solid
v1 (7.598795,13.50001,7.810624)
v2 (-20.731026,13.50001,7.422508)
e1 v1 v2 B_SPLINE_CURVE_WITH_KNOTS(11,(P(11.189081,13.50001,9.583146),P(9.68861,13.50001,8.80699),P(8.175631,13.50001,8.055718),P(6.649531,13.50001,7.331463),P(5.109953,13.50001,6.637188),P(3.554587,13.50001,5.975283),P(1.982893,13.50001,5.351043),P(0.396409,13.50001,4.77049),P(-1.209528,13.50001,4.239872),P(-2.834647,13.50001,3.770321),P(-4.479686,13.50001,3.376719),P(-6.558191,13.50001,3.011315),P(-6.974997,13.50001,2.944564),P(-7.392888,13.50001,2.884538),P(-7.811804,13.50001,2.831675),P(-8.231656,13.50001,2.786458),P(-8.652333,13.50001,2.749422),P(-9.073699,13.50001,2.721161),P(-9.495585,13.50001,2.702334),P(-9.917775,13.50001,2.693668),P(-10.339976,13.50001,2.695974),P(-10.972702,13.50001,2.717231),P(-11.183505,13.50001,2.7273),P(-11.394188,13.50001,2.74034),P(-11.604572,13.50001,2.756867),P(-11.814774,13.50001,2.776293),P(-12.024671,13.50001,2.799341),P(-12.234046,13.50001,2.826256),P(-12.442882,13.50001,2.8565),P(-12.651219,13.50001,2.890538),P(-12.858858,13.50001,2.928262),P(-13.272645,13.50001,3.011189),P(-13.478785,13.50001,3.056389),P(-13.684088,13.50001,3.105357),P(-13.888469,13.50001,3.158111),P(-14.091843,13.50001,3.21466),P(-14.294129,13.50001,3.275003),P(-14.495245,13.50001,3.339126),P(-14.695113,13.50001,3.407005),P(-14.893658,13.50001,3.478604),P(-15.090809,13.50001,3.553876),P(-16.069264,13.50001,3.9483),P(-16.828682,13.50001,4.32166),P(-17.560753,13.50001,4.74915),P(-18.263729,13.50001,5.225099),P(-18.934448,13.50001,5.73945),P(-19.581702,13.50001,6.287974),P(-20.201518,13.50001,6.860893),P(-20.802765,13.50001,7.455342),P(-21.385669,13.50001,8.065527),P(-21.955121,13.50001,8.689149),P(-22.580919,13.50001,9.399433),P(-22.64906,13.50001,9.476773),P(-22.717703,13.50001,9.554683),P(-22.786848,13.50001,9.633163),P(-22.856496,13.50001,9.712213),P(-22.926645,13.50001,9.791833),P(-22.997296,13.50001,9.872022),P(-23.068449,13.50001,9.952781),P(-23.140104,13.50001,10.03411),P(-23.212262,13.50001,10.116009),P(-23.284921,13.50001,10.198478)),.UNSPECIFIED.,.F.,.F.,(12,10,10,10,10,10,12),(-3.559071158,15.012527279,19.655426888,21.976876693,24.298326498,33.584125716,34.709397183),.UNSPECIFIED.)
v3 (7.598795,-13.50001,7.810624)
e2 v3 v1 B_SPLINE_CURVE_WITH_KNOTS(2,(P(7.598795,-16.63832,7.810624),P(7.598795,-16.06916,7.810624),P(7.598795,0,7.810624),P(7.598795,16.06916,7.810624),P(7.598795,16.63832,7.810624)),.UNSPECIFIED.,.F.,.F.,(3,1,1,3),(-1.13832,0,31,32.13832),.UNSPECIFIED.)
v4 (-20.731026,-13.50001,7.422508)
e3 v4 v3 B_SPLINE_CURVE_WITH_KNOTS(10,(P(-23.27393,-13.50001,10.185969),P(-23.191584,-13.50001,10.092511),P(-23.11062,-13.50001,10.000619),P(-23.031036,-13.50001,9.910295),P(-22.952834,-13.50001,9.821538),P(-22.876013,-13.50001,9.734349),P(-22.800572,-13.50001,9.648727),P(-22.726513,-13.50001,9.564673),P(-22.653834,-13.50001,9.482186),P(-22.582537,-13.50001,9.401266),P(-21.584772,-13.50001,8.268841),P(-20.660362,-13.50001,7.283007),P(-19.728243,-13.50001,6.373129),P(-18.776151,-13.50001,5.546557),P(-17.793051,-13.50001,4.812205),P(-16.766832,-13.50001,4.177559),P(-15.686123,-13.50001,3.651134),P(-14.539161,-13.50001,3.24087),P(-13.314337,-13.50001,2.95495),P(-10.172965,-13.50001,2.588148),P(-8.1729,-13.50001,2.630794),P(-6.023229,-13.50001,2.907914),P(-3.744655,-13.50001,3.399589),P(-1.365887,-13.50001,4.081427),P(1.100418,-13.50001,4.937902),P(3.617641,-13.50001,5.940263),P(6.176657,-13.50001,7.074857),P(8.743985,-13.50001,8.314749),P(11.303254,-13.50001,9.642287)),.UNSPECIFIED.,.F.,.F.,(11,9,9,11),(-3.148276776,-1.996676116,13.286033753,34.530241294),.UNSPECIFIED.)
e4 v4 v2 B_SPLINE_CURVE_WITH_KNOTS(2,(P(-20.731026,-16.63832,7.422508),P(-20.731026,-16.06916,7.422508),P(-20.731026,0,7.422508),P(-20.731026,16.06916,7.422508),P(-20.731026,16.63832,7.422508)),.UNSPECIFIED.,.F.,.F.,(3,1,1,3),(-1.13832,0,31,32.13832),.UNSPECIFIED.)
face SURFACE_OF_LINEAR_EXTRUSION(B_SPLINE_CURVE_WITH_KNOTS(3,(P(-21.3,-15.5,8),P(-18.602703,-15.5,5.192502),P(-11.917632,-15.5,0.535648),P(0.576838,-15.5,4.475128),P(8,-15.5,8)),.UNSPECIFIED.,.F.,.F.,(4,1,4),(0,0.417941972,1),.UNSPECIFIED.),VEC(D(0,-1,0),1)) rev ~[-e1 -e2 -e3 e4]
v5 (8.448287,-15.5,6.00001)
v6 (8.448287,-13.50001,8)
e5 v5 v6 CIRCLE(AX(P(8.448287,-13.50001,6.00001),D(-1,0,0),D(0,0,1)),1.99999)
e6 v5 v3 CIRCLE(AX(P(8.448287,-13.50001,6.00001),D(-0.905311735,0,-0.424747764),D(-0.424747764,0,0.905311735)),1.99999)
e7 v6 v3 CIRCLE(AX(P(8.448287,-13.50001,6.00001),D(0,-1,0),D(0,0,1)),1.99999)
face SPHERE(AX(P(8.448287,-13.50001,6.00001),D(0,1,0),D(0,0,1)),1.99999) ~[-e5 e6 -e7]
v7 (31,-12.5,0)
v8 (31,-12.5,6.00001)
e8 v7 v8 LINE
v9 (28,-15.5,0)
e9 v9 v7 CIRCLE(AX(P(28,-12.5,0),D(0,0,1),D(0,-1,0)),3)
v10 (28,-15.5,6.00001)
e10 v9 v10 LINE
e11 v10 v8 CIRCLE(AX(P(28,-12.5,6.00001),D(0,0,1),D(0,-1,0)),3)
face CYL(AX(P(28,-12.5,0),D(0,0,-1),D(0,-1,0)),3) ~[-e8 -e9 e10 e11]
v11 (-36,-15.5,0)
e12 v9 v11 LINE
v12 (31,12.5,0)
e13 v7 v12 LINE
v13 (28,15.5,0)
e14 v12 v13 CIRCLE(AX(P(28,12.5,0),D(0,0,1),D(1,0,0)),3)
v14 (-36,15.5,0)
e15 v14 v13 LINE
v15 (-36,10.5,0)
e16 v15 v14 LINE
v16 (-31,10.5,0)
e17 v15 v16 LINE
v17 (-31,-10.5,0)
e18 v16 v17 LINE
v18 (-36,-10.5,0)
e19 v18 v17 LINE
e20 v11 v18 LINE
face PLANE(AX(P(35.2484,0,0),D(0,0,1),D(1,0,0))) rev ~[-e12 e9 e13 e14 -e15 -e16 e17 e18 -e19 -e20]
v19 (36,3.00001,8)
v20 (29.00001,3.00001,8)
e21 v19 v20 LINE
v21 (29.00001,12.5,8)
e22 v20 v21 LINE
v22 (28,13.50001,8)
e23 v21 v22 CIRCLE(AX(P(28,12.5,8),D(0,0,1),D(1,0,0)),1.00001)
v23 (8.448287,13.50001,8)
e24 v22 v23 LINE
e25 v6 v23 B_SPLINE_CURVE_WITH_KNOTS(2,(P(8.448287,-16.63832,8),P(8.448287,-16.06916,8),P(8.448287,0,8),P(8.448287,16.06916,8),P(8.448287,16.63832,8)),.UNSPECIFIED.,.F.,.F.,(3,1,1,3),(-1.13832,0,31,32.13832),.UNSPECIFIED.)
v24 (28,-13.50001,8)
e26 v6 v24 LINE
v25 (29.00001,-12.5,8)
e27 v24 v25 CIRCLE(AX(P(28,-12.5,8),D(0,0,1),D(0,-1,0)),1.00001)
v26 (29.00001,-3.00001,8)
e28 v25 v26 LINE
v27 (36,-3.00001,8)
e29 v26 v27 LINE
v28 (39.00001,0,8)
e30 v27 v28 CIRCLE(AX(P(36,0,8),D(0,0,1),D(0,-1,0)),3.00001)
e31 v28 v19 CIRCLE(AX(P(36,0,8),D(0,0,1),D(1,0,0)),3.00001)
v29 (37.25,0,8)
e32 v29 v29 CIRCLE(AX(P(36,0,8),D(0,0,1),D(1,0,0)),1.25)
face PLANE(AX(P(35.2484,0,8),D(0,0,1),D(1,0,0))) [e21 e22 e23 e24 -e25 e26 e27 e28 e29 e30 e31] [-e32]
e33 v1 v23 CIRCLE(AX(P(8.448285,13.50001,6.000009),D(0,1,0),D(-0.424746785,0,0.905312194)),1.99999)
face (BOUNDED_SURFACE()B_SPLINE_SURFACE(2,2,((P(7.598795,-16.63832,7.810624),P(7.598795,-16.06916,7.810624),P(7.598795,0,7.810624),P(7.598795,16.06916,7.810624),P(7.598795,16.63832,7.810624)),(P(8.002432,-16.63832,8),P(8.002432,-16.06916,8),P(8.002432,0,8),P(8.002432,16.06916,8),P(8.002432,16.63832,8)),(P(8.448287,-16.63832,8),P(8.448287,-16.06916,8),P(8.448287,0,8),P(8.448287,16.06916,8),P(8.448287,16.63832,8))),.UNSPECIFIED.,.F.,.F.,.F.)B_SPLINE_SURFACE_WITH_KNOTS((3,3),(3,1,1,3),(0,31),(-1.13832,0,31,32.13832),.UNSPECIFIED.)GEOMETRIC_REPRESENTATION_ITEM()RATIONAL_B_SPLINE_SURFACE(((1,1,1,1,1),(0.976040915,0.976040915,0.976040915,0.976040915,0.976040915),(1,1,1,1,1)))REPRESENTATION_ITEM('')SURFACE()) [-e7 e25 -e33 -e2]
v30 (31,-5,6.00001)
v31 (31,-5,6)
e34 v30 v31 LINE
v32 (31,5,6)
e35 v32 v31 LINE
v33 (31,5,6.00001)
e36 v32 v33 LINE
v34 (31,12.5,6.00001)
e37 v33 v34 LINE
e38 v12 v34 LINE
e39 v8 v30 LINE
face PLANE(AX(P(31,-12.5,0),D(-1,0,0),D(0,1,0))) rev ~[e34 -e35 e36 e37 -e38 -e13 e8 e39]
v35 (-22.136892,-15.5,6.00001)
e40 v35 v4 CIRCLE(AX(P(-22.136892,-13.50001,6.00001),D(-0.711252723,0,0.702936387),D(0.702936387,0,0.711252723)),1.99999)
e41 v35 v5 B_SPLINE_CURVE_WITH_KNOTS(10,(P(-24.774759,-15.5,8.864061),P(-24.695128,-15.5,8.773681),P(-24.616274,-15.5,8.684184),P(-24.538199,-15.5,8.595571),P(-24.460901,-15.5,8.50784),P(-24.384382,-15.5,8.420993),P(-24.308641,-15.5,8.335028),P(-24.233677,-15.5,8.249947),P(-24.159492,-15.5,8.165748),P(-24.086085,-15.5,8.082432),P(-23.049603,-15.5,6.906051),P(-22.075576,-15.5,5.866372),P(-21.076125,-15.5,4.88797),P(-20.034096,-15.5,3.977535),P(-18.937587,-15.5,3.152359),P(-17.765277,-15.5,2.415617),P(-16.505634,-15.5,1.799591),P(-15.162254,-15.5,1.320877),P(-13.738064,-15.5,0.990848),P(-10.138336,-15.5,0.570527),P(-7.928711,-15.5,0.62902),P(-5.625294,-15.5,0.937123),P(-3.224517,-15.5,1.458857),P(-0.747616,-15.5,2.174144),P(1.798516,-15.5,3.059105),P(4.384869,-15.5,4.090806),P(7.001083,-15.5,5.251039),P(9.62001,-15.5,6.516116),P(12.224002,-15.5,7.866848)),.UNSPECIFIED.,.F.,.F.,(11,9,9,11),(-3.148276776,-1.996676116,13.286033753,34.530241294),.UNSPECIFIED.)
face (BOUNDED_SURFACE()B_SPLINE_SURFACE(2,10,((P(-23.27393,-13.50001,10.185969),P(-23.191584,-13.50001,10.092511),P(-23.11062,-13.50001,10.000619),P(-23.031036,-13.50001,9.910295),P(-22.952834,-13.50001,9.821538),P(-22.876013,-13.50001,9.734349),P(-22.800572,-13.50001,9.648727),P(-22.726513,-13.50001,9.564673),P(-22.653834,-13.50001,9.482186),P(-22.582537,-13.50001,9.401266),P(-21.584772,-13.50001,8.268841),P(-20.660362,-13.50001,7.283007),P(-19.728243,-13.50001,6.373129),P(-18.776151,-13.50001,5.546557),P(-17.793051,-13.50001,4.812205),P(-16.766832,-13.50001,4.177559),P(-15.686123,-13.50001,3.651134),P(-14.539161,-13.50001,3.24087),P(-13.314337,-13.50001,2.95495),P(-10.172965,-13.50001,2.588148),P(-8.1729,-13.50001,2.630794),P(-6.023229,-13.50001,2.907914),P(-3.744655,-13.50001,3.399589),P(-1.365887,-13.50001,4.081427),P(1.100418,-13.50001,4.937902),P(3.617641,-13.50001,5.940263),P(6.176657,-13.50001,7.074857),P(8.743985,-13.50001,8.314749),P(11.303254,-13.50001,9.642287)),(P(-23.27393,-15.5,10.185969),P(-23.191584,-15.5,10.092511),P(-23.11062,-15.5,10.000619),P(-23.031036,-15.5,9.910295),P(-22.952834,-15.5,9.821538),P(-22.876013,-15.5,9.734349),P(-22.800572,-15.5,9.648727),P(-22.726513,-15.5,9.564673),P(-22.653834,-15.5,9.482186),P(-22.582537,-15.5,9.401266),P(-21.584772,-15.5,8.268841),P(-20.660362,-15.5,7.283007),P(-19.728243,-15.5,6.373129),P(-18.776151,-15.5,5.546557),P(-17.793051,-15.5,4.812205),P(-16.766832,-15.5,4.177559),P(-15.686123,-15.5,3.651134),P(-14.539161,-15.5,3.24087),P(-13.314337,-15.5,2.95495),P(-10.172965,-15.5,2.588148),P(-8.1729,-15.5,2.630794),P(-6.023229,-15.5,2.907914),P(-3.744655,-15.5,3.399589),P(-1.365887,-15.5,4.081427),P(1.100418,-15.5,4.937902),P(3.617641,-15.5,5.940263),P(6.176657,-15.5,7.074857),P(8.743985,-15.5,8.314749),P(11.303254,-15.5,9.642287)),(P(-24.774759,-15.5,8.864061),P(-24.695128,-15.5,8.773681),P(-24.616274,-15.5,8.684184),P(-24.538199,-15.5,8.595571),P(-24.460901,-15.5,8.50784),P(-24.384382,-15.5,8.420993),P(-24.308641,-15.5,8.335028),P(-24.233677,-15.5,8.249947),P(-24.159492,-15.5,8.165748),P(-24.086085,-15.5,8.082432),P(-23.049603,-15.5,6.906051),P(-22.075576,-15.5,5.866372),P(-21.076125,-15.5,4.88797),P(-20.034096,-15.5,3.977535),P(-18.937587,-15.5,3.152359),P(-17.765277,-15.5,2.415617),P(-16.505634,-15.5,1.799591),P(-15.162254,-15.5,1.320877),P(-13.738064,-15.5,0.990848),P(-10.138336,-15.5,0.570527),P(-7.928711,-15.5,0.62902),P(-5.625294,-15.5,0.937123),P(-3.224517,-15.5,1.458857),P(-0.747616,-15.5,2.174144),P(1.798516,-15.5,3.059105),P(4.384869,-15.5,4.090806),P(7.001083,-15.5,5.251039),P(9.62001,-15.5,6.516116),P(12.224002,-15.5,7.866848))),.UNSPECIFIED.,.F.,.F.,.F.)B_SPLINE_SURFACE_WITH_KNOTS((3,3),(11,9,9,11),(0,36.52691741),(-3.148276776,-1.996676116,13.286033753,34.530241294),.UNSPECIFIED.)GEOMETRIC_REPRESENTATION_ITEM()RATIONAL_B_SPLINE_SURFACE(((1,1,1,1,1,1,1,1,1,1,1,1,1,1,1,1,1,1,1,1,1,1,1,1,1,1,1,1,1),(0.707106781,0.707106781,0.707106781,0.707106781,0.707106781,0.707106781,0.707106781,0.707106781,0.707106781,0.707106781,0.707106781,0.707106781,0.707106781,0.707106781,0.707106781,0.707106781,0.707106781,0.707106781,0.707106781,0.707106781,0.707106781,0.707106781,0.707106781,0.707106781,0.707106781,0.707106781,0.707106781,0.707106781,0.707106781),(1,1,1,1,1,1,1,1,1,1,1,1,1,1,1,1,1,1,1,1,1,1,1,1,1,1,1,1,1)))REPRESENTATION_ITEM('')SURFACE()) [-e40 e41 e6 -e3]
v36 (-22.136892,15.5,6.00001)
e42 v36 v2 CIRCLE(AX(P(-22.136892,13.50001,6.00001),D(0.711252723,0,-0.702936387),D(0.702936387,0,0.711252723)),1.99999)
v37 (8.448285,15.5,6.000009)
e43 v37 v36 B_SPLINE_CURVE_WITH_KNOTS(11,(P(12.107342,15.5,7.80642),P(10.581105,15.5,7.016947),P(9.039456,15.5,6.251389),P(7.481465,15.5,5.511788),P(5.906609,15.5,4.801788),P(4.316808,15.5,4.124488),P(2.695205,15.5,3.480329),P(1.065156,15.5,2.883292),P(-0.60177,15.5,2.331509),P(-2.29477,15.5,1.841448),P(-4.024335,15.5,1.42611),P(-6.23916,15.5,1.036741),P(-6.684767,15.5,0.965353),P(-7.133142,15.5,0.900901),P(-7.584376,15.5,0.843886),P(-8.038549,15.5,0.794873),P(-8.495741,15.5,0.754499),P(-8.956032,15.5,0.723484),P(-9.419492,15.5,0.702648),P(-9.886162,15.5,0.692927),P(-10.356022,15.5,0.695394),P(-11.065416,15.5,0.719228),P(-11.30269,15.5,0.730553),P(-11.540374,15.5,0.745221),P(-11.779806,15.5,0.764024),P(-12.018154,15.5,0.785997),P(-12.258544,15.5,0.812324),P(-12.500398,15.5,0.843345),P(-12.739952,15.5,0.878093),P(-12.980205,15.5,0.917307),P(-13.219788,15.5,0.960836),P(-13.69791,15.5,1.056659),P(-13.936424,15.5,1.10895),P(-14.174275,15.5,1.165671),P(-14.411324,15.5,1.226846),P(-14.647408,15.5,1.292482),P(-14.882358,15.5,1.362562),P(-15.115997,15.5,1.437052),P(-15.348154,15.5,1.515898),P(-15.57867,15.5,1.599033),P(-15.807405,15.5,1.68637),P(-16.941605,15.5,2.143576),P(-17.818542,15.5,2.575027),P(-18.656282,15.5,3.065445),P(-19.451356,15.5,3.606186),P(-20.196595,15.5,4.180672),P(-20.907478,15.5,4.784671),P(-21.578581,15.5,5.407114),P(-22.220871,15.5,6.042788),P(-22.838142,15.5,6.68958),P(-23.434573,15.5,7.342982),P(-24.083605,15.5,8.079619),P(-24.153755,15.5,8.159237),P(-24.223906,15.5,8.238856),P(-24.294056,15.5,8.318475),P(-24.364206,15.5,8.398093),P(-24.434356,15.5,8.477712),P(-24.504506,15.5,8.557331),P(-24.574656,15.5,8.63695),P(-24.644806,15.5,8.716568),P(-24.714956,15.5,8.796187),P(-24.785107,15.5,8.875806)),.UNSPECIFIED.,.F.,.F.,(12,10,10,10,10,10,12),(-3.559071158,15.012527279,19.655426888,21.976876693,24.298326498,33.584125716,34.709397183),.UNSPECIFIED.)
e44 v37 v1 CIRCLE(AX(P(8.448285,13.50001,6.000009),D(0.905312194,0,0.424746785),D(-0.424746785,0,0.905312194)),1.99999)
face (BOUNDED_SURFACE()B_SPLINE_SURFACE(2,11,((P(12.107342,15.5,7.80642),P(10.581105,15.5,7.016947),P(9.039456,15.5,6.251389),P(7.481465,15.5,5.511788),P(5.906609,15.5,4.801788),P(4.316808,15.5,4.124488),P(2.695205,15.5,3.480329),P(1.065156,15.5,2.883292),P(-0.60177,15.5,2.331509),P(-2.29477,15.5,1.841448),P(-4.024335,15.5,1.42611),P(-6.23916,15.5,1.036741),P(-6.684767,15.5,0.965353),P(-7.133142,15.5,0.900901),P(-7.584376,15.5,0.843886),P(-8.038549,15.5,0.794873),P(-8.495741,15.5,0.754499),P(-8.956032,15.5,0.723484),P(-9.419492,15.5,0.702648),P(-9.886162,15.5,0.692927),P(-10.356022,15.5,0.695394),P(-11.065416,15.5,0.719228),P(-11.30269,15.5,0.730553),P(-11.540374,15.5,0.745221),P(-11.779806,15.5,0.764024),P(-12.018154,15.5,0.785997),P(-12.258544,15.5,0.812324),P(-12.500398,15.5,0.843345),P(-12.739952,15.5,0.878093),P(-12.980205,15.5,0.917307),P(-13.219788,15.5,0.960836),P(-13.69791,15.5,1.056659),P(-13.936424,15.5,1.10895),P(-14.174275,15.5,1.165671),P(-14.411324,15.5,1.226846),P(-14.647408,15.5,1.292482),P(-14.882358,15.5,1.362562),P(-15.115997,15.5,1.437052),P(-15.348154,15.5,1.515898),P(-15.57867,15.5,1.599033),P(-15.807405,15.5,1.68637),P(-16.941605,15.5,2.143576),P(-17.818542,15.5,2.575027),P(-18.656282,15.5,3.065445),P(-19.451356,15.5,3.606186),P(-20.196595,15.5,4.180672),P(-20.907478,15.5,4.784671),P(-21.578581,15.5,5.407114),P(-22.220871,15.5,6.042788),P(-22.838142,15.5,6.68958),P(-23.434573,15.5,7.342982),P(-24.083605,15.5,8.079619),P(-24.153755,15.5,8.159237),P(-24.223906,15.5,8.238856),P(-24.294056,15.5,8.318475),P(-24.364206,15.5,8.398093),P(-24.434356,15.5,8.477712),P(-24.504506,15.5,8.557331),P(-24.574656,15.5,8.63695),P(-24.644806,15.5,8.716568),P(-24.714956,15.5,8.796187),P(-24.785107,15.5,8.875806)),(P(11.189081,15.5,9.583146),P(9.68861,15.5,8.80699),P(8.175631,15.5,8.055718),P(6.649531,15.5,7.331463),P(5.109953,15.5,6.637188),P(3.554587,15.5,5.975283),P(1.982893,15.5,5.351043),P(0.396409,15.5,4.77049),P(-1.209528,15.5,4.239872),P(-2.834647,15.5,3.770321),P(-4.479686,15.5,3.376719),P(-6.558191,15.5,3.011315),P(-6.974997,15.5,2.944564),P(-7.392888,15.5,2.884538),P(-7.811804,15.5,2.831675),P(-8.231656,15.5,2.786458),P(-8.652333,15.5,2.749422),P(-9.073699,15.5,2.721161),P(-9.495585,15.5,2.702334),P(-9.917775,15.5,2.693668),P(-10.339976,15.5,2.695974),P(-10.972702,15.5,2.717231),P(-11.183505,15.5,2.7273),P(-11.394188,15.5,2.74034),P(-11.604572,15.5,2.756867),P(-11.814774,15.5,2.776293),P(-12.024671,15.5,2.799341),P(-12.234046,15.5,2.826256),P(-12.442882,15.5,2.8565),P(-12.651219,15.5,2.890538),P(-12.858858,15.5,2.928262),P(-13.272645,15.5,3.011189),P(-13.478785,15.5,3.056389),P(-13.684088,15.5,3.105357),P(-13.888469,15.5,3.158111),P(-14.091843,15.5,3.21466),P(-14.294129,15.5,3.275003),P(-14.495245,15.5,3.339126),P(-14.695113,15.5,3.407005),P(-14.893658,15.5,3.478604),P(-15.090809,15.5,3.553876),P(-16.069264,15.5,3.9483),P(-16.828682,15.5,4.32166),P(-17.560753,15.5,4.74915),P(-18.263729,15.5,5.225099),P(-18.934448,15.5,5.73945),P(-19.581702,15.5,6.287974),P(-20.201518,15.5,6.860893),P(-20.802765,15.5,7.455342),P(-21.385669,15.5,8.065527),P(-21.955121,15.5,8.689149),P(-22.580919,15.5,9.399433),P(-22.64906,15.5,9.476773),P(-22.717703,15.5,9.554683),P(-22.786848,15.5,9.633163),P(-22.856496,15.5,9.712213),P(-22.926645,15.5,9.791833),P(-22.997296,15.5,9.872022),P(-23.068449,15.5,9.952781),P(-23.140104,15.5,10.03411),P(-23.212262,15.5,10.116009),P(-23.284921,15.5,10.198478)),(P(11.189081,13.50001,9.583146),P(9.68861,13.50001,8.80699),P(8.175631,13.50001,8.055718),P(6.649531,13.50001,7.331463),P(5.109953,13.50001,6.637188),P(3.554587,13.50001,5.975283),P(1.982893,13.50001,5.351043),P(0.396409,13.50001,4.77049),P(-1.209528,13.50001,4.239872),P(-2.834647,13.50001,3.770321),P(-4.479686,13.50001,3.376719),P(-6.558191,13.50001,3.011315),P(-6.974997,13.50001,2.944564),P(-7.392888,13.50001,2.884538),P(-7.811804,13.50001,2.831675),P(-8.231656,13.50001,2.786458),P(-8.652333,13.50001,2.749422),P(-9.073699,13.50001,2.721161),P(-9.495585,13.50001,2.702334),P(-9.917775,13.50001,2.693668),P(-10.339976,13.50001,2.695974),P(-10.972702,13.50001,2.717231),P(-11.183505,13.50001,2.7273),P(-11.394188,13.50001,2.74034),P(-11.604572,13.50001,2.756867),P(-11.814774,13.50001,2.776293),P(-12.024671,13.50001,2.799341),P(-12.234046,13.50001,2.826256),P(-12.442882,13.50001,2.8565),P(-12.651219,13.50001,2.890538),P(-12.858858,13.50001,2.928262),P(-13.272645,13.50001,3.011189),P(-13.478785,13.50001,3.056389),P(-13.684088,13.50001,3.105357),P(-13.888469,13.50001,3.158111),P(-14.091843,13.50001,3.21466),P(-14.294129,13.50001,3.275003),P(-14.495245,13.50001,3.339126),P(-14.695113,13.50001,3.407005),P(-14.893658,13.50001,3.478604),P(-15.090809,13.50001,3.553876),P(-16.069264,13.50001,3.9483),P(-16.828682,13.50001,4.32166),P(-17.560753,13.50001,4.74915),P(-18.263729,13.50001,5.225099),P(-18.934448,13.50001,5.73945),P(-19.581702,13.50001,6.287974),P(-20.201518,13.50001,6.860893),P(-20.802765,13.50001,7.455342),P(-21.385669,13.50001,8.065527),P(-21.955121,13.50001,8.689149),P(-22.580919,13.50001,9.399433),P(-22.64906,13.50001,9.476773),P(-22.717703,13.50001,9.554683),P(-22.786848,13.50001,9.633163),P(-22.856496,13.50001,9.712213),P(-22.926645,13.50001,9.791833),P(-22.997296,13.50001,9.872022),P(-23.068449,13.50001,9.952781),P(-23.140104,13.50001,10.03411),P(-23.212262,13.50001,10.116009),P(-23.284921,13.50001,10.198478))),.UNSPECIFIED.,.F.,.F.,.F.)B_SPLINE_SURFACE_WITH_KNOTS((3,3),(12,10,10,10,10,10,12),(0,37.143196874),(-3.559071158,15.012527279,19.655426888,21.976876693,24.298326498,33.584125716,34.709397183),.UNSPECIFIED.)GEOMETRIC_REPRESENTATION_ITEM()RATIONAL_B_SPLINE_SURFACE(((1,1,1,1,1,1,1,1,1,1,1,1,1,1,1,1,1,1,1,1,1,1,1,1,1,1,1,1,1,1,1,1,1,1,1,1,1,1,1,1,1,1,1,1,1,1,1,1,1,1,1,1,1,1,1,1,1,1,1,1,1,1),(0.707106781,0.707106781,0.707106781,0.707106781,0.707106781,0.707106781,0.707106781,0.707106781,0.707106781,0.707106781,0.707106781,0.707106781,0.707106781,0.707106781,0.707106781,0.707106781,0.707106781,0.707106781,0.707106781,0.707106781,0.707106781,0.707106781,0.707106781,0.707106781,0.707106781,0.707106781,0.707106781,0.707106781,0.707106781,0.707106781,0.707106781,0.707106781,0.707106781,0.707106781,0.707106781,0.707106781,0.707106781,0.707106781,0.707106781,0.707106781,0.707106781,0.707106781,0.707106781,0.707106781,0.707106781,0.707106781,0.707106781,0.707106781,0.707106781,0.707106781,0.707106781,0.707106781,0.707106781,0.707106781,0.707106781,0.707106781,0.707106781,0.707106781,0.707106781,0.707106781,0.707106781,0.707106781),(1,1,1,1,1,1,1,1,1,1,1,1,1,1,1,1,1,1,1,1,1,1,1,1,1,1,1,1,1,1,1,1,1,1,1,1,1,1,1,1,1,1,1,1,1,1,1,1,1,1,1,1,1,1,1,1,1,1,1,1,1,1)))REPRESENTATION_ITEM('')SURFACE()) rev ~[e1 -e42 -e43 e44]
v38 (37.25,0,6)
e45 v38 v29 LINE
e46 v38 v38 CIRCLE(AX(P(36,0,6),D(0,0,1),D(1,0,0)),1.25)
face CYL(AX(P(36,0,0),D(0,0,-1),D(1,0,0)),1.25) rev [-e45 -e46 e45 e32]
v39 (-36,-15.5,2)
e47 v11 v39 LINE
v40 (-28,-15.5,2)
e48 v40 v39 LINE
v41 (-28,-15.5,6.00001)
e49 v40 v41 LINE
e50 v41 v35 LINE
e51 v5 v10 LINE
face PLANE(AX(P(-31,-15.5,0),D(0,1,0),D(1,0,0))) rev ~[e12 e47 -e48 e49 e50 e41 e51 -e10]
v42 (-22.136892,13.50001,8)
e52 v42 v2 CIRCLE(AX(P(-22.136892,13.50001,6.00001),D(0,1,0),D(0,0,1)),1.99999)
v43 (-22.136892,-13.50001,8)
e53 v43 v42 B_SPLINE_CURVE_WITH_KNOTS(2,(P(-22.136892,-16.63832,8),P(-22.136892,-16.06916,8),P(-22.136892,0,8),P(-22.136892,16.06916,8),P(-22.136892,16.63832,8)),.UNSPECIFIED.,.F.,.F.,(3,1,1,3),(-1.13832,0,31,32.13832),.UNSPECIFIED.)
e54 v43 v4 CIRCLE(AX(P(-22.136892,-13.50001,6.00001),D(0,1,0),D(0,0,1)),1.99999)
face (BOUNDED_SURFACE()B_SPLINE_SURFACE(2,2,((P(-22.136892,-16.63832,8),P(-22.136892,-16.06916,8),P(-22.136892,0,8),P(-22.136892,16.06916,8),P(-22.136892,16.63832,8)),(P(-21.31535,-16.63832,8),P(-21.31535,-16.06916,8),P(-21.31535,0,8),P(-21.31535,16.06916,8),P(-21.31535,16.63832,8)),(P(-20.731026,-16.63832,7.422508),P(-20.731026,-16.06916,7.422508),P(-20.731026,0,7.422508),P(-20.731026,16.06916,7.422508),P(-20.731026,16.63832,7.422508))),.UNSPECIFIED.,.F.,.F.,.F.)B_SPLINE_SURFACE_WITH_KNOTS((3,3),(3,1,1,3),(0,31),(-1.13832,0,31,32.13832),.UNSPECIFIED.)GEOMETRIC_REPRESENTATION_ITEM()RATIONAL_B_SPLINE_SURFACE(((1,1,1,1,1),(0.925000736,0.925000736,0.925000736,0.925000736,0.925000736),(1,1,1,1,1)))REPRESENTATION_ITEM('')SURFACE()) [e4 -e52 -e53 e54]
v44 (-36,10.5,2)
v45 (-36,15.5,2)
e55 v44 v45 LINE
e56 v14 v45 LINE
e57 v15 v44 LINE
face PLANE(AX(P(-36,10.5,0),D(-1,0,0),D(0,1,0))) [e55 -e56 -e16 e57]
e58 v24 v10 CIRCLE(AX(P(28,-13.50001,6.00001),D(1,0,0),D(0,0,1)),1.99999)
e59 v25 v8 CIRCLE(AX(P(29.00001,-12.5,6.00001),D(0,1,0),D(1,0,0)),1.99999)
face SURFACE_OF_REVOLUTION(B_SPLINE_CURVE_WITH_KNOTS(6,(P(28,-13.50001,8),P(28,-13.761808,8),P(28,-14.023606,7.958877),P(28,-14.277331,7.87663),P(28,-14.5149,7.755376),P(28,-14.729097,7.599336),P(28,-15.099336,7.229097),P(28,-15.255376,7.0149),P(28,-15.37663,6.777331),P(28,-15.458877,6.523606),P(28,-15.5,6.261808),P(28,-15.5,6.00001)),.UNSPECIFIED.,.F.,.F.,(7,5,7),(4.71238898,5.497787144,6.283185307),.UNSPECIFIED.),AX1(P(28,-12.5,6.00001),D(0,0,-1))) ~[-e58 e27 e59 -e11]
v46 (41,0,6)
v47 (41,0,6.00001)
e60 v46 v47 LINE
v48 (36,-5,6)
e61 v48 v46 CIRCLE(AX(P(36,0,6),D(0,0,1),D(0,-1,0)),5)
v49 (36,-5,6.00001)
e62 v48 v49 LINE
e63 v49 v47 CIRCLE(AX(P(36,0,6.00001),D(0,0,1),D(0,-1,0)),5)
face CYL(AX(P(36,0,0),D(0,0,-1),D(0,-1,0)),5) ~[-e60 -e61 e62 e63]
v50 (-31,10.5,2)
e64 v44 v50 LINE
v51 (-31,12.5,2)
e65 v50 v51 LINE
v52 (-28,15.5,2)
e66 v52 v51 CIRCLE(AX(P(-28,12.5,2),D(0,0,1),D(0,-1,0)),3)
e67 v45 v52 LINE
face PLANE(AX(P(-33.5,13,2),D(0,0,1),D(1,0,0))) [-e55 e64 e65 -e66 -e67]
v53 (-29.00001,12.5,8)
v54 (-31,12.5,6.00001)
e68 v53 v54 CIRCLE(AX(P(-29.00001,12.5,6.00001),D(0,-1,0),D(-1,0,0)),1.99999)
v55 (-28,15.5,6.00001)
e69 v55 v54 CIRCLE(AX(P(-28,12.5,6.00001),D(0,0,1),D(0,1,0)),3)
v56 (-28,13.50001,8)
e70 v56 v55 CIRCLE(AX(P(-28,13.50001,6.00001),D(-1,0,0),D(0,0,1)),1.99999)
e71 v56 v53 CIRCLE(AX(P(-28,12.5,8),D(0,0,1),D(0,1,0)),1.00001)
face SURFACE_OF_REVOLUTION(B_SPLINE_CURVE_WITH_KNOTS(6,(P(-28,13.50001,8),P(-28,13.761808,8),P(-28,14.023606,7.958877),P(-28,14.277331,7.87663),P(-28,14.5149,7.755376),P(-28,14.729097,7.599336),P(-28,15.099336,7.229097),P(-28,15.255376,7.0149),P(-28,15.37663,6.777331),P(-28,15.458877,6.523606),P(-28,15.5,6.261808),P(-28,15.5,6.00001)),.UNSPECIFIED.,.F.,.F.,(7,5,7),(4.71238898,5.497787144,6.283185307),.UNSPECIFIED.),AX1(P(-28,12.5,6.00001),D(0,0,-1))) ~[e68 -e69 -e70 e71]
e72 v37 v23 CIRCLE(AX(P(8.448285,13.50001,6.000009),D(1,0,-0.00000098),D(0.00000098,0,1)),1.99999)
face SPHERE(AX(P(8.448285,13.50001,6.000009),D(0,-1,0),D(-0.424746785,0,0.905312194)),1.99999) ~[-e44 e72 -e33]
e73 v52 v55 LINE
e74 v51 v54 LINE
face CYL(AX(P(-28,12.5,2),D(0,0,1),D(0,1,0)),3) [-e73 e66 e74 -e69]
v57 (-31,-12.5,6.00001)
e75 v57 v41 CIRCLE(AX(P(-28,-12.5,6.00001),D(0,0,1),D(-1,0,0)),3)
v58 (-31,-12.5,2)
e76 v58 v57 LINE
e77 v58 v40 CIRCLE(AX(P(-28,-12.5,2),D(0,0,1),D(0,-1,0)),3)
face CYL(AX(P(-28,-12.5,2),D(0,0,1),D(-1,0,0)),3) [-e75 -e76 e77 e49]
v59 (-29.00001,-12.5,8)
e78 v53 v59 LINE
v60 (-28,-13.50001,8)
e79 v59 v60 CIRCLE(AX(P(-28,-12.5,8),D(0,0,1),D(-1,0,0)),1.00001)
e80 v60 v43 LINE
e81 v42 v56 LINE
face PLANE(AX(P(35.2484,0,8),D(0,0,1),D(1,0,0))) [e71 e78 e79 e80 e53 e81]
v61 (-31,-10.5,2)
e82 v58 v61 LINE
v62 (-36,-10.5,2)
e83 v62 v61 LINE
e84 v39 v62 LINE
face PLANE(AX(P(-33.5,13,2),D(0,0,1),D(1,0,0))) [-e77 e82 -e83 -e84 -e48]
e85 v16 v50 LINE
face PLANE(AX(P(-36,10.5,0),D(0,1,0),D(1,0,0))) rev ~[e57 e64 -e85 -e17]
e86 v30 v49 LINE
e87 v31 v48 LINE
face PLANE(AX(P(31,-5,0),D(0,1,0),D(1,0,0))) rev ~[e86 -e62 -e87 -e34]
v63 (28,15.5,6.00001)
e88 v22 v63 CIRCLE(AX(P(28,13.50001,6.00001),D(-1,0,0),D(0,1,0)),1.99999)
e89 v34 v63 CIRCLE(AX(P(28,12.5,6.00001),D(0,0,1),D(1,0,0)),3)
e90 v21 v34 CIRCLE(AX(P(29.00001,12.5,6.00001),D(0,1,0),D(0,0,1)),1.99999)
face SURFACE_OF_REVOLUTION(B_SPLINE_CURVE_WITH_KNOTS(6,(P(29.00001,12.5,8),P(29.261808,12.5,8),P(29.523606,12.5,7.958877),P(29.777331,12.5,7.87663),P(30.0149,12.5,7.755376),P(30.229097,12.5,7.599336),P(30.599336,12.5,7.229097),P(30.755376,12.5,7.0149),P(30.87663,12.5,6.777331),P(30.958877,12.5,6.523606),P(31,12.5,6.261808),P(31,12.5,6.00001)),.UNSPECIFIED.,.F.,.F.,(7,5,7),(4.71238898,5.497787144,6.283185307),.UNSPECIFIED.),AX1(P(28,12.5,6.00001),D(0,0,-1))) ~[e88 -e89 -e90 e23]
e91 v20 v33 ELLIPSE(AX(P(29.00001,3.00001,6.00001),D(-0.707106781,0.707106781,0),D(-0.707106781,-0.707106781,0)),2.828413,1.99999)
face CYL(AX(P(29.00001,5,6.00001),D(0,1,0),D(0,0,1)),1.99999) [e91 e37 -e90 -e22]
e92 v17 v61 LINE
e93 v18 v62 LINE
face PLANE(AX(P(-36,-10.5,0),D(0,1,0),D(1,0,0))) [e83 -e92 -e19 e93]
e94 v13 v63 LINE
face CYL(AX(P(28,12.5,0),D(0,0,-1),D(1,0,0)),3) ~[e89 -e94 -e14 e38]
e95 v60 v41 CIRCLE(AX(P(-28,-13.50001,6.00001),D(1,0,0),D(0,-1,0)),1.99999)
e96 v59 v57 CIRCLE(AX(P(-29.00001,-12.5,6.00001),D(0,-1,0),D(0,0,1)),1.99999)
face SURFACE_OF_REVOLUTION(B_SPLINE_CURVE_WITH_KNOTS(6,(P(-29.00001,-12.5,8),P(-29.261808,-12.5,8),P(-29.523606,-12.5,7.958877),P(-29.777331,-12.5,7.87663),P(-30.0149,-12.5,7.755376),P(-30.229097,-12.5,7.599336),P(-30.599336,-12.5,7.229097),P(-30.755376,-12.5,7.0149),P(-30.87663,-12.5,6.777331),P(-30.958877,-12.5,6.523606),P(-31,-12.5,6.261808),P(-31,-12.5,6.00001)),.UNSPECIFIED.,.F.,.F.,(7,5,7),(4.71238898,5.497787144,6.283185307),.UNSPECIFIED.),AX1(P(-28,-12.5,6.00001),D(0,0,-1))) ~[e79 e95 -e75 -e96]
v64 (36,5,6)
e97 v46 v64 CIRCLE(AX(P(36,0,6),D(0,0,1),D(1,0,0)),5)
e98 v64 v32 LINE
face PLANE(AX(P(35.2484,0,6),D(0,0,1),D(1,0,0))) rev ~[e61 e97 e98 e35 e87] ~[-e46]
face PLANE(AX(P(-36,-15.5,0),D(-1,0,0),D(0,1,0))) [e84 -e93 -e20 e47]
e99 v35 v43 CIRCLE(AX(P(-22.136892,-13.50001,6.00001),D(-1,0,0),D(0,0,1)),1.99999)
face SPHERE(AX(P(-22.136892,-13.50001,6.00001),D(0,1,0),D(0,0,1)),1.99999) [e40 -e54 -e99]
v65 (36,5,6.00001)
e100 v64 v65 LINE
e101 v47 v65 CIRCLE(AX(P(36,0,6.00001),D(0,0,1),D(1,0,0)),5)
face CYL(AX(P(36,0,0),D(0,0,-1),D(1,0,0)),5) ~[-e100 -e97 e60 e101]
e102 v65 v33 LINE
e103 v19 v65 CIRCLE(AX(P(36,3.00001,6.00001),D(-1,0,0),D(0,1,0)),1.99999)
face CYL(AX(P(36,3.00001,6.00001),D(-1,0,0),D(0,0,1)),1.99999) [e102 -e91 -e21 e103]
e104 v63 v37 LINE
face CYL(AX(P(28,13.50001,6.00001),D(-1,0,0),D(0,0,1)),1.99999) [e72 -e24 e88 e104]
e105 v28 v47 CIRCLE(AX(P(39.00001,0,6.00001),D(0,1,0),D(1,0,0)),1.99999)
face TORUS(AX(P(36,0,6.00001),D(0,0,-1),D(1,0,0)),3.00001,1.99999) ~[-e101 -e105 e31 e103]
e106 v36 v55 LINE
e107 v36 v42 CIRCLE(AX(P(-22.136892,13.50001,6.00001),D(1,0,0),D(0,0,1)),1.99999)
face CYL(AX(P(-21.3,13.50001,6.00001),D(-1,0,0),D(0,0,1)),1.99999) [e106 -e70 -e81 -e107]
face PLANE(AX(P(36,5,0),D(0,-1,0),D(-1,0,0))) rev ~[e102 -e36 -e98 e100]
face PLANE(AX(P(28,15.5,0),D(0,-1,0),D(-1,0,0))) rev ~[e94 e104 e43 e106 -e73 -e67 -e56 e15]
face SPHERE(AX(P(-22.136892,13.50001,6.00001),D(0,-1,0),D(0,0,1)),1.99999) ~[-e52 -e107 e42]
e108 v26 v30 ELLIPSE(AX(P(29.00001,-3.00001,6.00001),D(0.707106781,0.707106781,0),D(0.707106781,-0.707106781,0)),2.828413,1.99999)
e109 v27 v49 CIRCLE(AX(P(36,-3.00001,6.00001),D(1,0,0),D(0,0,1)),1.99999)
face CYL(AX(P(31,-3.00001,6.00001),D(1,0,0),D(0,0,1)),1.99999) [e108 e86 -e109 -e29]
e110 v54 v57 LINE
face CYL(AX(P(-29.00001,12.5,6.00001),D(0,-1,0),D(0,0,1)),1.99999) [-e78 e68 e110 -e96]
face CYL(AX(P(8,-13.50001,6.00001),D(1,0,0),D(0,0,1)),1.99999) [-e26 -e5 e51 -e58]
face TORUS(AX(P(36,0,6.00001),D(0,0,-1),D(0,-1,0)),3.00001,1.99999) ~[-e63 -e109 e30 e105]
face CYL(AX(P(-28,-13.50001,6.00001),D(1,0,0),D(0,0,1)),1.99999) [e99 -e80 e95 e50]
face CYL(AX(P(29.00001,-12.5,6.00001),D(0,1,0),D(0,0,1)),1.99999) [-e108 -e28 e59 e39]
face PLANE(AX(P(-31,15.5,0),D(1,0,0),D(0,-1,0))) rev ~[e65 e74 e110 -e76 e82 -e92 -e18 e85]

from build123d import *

# Parameters (mm, degrees)
F0_W     = 5
F0_H     = 5
F1_DEPTH = 2
F0_R     = 1.25
F2_DEPTH = 8
F3_DEPTH = 6
F5_R     = 3
F6_DEPTH = 50
F7_R     = 1.99999


# Not quite as in the source:
# - a fillet or chamfer is up to 0.001 mm smaller than in the source, because OpenCascade refuses the exact size


with BuildPart() as f1:
    # F0 (on Top) → F1 (new body)
    with BuildSketch(Plane.XY):
        with Locations((-33.5, 13)):
            Rectangle(F0_W, F0_H)
        with BuildLine():
            Line((-31, -15.5), (28, -15.5))
            ThreePointArc((28, -15.5), (30.1213203436, -14.6213203436), (31, -12.5))
            Line((31, -12.5), (31, -5))
            Line((31, -5), (31, 5))
            Line((31, 5), (31, 12.5))
            ThreePointArc((31, 12.5), (30.1213203436, 14.6213203436), (28, 15.5))
            Line((28, 15.5), (-31, 15.5))
            Line((-31, 15.5), (-31, 10.5))
            Line((-31, 10.5), (-31, -10.5))
            Line((-31, -10.5), (-31, -15.5))
        make_face()
        with Locations((-33.5, -13)):
            Rectangle(F0_W, F0_H)
    extrude(amount=F1_DEPTH)

    # F0 (on Top) → F2 (join)
    with BuildSketch(Plane.XY):
        with BuildLine():
            Line((31, 5), (31, -5))
            Line((31, -5), (36, -5))
            ThreePointArc((36, -5), (39.5355339059, -3.5355339059), (41, 0))
            ThreePointArc((41, 0), (39.5355339059, 3.5355339059), (36, 5))
            Line((36, 5), (31, 5))
        make_face()
        with Locations((36, 0)):
            Circle(F0_R, mode=Mode.SUBTRACT)
        with BuildLine():
            Line((-31, -15.5), (28, -15.5))
            ThreePointArc((28, -15.5), (30.1213203436, -14.6213203436), (31, -12.5))
            Line((31, -12.5), (31, -5))
            Line((31, -5), (31, 5))
            Line((31, 5), (31, 12.5))
            ThreePointArc((31, 12.5), (30.1213203436, 14.6213203436), (28, 15.5))
            Line((28, 15.5), (-31, 15.5))
            Line((-31, 15.5), (-31, 10.5))
            Line((-31, 10.5), (-31, -10.5))
            Line((-31, -10.5), (-31, -15.5))
        make_face()
    extrude(amount=F2_DEPTH)

    # F0 (on Top) → F3 (cut)
    with BuildSketch(Plane.XY):
        with BuildLine():
            Line((31, 5), (31, -5))
            Line((31, -5), (36, -5))
            ThreePointArc((36, -5), (39.5355339059, -3.5355339059), (41, 0))
            ThreePointArc((41, 0), (39.5355339059, 3.5355339059), (36, 5))
            Line((36, 5), (31, 5))
        make_face()
        with Locations((36, 0)):
            Circle(F0_R, mode=Mode.SUBTRACT)
    extrude(amount=F3_DEPTH, mode=Mode.SUBTRACT)

    # F5
    f5_edges = [f1.edges().sort_by_distance(p)[0] for p in [
        (-31, 15.5, 5),
        (-31, -15.5, 5),
    ]]
    fillet(f5_edges, radius=F5_R)

    # F4 (on face) → F6 (cut)
    with BuildSketch(Plane.XZ.offset(15.5)):
        with BuildLine():
            Line((8, 8), (-21.3, 8))
            add(Edge.make_bspline(
                [(-21.3, 8), (-18.6027030945, 5.1925020669), (-11.9176320955, 0.5356481102), (0.5768376855, 4.4751283983), (8, 8)],
                knots=[0, 0, 0, 0, 0.4179419715, 1, 1, 1, 1], degree=3))
        make_face()
    extrude(amount=-F6_DEPTH, mode=Mode.SUBTRACT)

    # F7 (radius 2 in the source; OpenCascade refuses exactly that, so slightly less here)
    f7_edges = [f1.edges().sort_by_distance(p)[0] for p in [
        (33.5, -5, 8),
        (30.12132, -14.62132, 8),
        (-7.010651, -15.5, 2.945097),
        (8, 0, 8),
        (-7.010651, 15.5, 2.945097),
        (-21.3, 0, 8),
        (33.5, 5, 8),
        (31, 8.75, 8),
        (30.12132, 14.62132, 8),
        (-24.65, -15.5, 8),
        (-30.12132, -14.62132, 8),
        (-31, 0, 8),
        (-30.12132, 14.62132, 8),
        (-24.65, 15.5, 8),
        (18, -15.5, 8),
        (31, -8.75, 8),
        (41, 0, 8),
        (18, 15.5, 8),
    ]]
    fillet(f7_edges, radius=F7_R)


solid = f1.part
